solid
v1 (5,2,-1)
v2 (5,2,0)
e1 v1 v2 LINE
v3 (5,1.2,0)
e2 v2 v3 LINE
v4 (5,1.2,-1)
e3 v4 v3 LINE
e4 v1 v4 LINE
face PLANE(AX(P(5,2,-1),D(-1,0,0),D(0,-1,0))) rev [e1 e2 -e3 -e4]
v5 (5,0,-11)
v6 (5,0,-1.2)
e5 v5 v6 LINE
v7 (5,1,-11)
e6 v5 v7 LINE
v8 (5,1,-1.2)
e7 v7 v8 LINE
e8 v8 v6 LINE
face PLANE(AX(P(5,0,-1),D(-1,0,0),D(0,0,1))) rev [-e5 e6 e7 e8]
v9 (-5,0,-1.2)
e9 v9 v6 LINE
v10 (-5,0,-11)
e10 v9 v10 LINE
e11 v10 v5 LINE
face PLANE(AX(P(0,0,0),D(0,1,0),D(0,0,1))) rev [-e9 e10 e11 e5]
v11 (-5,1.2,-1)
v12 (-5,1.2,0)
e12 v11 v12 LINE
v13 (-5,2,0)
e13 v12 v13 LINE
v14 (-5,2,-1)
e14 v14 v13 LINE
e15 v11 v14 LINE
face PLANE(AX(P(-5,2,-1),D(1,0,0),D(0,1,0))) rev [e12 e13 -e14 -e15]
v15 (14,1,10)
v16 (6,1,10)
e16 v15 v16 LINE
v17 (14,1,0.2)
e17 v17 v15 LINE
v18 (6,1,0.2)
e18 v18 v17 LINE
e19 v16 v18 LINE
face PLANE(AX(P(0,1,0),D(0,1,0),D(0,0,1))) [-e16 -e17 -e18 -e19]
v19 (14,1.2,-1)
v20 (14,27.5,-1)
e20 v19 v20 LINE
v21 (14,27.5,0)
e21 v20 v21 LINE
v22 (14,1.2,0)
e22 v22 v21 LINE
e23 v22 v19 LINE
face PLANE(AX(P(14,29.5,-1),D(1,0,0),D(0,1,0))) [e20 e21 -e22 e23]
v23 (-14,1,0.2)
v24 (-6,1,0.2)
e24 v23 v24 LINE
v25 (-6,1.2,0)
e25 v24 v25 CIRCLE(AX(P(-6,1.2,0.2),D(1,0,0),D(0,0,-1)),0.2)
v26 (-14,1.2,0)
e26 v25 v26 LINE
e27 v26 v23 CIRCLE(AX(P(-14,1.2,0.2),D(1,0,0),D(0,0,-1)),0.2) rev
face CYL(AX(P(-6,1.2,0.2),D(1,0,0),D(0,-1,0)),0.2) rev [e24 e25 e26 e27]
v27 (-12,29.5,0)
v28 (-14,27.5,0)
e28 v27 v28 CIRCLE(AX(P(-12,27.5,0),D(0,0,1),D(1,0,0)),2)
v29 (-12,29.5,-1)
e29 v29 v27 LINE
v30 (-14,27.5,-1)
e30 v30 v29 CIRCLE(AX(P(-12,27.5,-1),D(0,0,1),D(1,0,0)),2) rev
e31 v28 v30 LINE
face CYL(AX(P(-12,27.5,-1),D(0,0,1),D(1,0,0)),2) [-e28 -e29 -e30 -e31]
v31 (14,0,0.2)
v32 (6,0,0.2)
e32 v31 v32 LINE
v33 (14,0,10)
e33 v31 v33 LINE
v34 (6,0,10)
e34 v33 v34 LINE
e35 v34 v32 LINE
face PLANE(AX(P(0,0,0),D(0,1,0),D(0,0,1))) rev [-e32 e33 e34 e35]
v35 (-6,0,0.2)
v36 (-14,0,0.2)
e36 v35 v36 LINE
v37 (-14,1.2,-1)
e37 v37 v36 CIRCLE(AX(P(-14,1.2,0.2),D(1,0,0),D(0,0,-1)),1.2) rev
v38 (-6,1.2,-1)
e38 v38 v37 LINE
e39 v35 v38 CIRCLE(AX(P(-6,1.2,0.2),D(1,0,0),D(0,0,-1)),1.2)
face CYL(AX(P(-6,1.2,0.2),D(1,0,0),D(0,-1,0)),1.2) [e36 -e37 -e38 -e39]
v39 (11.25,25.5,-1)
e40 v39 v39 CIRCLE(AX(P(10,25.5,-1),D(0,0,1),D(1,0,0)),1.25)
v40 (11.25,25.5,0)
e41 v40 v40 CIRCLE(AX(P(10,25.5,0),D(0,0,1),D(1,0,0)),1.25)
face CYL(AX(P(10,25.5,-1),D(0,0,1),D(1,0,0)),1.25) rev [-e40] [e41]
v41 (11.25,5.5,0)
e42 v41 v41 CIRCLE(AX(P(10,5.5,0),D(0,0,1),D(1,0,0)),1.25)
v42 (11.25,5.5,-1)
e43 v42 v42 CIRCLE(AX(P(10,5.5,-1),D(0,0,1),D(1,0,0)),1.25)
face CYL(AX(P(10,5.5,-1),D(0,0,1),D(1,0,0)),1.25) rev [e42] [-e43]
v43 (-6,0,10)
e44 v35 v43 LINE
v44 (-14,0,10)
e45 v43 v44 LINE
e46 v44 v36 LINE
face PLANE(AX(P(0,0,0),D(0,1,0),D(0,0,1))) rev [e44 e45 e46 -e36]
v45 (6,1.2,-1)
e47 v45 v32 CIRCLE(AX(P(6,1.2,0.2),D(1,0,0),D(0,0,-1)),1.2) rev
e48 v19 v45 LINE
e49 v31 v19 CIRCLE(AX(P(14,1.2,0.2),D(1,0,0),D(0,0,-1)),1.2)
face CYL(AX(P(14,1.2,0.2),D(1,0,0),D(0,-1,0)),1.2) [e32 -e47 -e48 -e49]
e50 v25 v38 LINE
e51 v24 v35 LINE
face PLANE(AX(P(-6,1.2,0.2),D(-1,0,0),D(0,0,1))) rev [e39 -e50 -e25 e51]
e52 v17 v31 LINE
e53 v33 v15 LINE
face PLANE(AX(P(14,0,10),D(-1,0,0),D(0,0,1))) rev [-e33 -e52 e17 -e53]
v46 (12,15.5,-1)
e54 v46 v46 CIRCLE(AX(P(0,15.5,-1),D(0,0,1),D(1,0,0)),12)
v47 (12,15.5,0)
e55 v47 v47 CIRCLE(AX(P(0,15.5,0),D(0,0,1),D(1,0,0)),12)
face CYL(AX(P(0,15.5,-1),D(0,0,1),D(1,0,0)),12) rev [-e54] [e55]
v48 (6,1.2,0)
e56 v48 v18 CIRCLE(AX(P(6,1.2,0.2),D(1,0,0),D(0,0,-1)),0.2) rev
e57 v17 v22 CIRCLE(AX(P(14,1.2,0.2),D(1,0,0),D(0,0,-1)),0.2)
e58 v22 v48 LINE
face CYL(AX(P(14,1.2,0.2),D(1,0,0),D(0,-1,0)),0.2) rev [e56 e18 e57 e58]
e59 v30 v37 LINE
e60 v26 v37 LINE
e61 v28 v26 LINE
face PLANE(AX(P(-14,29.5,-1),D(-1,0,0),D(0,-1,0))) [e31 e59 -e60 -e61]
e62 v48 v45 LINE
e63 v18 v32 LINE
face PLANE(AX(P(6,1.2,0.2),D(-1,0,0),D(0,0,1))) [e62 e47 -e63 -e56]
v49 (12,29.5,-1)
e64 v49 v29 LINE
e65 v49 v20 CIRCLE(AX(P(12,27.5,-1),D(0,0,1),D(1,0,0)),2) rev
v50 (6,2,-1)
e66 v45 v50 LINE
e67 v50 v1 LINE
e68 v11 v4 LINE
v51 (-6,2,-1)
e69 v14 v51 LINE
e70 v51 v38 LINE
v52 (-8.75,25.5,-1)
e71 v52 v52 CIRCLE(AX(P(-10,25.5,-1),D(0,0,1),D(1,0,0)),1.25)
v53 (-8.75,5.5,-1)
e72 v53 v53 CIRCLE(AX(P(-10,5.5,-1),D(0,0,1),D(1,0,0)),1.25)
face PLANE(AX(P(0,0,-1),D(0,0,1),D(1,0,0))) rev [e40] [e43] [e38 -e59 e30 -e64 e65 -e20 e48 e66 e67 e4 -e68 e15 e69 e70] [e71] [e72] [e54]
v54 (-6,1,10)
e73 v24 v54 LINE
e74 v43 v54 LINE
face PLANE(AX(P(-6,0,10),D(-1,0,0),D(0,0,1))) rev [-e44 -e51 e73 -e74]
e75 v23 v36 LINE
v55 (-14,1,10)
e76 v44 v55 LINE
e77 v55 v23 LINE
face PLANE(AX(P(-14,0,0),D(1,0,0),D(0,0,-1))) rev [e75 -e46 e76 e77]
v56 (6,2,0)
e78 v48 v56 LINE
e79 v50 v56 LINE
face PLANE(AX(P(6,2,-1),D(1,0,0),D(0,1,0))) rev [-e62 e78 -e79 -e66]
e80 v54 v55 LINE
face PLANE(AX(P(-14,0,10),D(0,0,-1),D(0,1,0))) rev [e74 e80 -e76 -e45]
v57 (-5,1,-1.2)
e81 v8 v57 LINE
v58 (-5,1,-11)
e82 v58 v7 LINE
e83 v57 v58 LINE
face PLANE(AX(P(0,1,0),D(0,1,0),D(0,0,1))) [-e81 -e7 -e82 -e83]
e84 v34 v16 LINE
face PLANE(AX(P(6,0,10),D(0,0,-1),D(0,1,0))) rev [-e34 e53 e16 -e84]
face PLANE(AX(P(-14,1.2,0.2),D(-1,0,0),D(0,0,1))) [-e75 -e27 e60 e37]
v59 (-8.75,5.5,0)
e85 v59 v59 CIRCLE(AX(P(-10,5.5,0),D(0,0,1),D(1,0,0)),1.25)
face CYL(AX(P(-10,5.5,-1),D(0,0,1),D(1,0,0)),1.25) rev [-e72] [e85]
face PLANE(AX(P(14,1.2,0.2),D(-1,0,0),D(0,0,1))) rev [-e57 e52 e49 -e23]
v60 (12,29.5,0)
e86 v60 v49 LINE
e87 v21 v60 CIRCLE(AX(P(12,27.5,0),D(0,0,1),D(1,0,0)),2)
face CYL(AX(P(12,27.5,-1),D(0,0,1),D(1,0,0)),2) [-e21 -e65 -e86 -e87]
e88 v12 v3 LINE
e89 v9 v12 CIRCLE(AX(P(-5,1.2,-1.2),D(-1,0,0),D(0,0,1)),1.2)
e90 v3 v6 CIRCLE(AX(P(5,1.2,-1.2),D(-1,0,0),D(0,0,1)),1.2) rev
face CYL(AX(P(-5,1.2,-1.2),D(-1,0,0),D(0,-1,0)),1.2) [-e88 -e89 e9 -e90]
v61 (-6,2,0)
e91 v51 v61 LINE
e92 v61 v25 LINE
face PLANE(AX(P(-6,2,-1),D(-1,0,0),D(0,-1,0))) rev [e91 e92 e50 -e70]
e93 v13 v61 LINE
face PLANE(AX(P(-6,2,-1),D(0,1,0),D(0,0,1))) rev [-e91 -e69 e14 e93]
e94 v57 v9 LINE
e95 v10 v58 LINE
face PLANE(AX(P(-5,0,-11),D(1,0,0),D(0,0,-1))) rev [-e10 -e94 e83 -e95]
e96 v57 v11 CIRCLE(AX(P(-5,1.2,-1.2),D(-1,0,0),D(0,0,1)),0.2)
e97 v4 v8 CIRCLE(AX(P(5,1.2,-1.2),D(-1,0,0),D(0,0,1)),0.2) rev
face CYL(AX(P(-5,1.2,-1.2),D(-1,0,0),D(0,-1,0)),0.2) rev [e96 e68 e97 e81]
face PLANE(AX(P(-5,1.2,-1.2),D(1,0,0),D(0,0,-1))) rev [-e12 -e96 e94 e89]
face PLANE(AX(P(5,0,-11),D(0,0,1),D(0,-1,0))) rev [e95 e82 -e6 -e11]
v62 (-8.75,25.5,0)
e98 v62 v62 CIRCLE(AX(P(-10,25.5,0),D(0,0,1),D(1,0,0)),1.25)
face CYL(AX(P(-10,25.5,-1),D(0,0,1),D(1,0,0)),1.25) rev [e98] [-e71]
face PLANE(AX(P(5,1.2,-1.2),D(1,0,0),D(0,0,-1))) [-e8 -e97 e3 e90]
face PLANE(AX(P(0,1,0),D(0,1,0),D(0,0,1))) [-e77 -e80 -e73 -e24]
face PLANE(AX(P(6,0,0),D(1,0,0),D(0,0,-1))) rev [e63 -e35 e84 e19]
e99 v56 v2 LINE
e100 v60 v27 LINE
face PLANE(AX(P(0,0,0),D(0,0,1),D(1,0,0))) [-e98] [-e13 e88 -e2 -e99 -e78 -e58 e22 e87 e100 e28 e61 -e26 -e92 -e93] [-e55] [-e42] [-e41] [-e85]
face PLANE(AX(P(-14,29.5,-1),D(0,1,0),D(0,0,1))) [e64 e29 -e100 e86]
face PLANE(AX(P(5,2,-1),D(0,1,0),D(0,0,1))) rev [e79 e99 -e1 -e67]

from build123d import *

# Parameters (mm, degrees)
SKIZZE1_W                       = 28
SKIZZE1_H                       = 29.5
SKIZZE1_R                       = 1.25
SKIZZE1_R_2                     = 12
BASIS_BLECH1_DEPTH              = 1
VERRUNDUNG1_R                   = 2
SKIZZE9_W                       = 1
SKIZZE9_H                       = 2
SCHNITT_LINEAR_AUSTRAGEN1_DEPTH = 33.668792448
KANTE_LASCHE2_STRIP_W           = 4.4
KANTE_LASCHE2_STRIP_H           = 1
KANTE_LASCHE2_STRIP_CUT_DEPTH   = 8
KANTE_LASCHE2_STRIP_2_W         = 4.4
KANTE_LASCHE2_STRIP_2_H         = 1
KANTE_LASCHE2_STRIP_CUT_2_DEPTH = 8
KANTE_LASCHE2_DEPTH             = 8
KANTE_LASCHE2_BEND_DEPTH        = 8
KANTE_LASCHE3_STRIP_W           = 4.4
KANTE_LASCHE3_STRIP_H           = 1
KANTE_LASCHE3_STRIP_CUT_DEPTH   = 10
KANTE_LASCHE3_DEPTH             = 10


# Sheet-metal steps are written as plain solids
with BuildPart() as part:
    # Skizze1 → Basis-Blech1 (new body)
    with BuildSketch(Plane.XY):
        with Locations((0, 14.75)):
            Rectangle(SKIZZE1_W, SKIZZE1_H)
        with Locations((-10, 25.5)):
            Circle(SKIZZE1_R, mode=Mode.SUBTRACT)
        with Locations((10, 25.5)):
            Circle(SKIZZE1_R, mode=Mode.SUBTRACT)
        with Locations((10, 5.5)):
            Circle(SKIZZE1_R, mode=Mode.SUBTRACT)
        with Locations((-10, 5.5)):
            Circle(SKIZZE1_R, mode=Mode.SUBTRACT)
        with Locations((0, 15.5)):
            Circle(SKIZZE1_R_2, mode=Mode.SUBTRACT)
    extrude(amount=-BASIS_BLECH1_DEPTH)

    # Verrundung1
    verrundung1_edges = [part.edges().sort_by_distance(p)[0] for p in [
        (-14, 29.5, -0.5),
        (14, 29.5, -0.5),
    ]]
    fillet(verrundung1_edges, radius=VERRUNDUNG1_R)

    # Skizze9 → Schnitt-Linear austragen1 (cut, through all)
    with BuildSketch(Plane.XY):
        with Locations((-5.5, 1)):
            Rectangle(SKIZZE9_W, SKIZZE9_H)
        with Locations((5.5, 1)):
            Rectangle(SKIZZE9_W, SKIZZE9_H)
    extrude(amount=-SCHNITT_LINEAR_AUSTRAGEN1_DEPTH, mode=Mode.SUBTRACT)

    # Kante-Lasche2 strip (across the edge) → Kante-Lasche2 strip cut (cut)
    with BuildSketch(Plane.YZ.offset(-14)):
        with Locations((-1, -0.5)):
            Rectangle(KANTE_LASCHE2_STRIP_W, KANTE_LASCHE2_STRIP_H)
    extrude(amount=KANTE_LASCHE2_STRIP_CUT_DEPTH, mode=Mode.SUBTRACT)

    # Kante-Lasche2 strip 2 (across the edge) → Kante-Lasche2 strip cut 2 (cut)
    with BuildSketch(Plane.YZ.offset(6)):
        with Locations((-1, -0.5)):
            Rectangle(KANTE_LASCHE2_STRIP_2_W, KANTE_LASCHE2_STRIP_2_H)
    extrude(amount=KANTE_LASCHE2_STRIP_CUT_2_DEPTH, mode=Mode.SUBTRACT)

    # Kante-Lasche2 section (across the edge) → Kante-Lasche2 (add)
    with BuildSketch(Plane.YZ.offset(-14)):
        with BuildLine():
            Line((0, 0.2), (0, 10))
            Line((0, 10), (1, 10))
            Line((1, 10), (1, 0.2))
            ThreePointArc((1, 0.2), (1.058578644, 0.058578644), (1.2, 0))
            Line((1.2, 0), (1.2, -1))
            ThreePointArc((1.2, -1), (0.351471863, -0.648528137), (0, 0.2))
        make_face()
    extrude(amount=KANTE_LASCHE2_DEPTH)

    # Kante-Lasche2 section 2 (across the edge) → Kante-Lasche2 bend (add)
    with BuildSketch(Plane.YZ.offset(6)):
        with BuildLine():
            Line((0, 0.2), (0, 10))
            Line((0, 10), (1, 10))
            Line((1, 10), (1, 0.2))
            ThreePointArc((1, 0.2), (1.058578644, 0.058578644), (1.2, 0))
            Line((1.2, 0), (1.2, -1))
            ThreePointArc((1.2, -1), (0.351471863, -0.648528137), (0, 0.2))
        make_face()
    extrude(amount=KANTE_LASCHE2_BEND_DEPTH)

    # Kante-Lasche3 strip (across the edge) → Kante-Lasche3 strip cut (cut)
    with BuildSketch(Plane(origin=(5, 0, -1), x_dir=(0, 1, 0), z_dir=(-1, 0, 0))):
        with Locations((-1, -0.5)):
            Rectangle(KANTE_LASCHE3_STRIP_W, KANTE_LASCHE3_STRIP_H)
    extrude(amount=KANTE_LASCHE3_STRIP_CUT_DEPTH, mode=Mode.SUBTRACT)

    # Kante-Lasche3 section (across the edge) → Kante-Lasche3 (add)
    with BuildSketch(Plane(origin=(5, 0, -1), x_dir=(0, 1, 0), z_dir=(-1, 0, 0))):
        with BuildLine():
            Line((0, 0.2), (0, 10))
            Line((0, 10), (1, 10))
            Line((1, 10), (1, 0.2))
            ThreePointArc((1, 0.2), (1.058578644, 0.058578644), (1.2, 0))
            Line((1.2, 0), (1.2, -1))
            ThreePointArc((1.2, -1), (0.351471863, -0.648528137), (0, 0.2))
        make_face()
    extrude(amount=KANTE_LASCHE3_DEPTH)


solid = part.part
